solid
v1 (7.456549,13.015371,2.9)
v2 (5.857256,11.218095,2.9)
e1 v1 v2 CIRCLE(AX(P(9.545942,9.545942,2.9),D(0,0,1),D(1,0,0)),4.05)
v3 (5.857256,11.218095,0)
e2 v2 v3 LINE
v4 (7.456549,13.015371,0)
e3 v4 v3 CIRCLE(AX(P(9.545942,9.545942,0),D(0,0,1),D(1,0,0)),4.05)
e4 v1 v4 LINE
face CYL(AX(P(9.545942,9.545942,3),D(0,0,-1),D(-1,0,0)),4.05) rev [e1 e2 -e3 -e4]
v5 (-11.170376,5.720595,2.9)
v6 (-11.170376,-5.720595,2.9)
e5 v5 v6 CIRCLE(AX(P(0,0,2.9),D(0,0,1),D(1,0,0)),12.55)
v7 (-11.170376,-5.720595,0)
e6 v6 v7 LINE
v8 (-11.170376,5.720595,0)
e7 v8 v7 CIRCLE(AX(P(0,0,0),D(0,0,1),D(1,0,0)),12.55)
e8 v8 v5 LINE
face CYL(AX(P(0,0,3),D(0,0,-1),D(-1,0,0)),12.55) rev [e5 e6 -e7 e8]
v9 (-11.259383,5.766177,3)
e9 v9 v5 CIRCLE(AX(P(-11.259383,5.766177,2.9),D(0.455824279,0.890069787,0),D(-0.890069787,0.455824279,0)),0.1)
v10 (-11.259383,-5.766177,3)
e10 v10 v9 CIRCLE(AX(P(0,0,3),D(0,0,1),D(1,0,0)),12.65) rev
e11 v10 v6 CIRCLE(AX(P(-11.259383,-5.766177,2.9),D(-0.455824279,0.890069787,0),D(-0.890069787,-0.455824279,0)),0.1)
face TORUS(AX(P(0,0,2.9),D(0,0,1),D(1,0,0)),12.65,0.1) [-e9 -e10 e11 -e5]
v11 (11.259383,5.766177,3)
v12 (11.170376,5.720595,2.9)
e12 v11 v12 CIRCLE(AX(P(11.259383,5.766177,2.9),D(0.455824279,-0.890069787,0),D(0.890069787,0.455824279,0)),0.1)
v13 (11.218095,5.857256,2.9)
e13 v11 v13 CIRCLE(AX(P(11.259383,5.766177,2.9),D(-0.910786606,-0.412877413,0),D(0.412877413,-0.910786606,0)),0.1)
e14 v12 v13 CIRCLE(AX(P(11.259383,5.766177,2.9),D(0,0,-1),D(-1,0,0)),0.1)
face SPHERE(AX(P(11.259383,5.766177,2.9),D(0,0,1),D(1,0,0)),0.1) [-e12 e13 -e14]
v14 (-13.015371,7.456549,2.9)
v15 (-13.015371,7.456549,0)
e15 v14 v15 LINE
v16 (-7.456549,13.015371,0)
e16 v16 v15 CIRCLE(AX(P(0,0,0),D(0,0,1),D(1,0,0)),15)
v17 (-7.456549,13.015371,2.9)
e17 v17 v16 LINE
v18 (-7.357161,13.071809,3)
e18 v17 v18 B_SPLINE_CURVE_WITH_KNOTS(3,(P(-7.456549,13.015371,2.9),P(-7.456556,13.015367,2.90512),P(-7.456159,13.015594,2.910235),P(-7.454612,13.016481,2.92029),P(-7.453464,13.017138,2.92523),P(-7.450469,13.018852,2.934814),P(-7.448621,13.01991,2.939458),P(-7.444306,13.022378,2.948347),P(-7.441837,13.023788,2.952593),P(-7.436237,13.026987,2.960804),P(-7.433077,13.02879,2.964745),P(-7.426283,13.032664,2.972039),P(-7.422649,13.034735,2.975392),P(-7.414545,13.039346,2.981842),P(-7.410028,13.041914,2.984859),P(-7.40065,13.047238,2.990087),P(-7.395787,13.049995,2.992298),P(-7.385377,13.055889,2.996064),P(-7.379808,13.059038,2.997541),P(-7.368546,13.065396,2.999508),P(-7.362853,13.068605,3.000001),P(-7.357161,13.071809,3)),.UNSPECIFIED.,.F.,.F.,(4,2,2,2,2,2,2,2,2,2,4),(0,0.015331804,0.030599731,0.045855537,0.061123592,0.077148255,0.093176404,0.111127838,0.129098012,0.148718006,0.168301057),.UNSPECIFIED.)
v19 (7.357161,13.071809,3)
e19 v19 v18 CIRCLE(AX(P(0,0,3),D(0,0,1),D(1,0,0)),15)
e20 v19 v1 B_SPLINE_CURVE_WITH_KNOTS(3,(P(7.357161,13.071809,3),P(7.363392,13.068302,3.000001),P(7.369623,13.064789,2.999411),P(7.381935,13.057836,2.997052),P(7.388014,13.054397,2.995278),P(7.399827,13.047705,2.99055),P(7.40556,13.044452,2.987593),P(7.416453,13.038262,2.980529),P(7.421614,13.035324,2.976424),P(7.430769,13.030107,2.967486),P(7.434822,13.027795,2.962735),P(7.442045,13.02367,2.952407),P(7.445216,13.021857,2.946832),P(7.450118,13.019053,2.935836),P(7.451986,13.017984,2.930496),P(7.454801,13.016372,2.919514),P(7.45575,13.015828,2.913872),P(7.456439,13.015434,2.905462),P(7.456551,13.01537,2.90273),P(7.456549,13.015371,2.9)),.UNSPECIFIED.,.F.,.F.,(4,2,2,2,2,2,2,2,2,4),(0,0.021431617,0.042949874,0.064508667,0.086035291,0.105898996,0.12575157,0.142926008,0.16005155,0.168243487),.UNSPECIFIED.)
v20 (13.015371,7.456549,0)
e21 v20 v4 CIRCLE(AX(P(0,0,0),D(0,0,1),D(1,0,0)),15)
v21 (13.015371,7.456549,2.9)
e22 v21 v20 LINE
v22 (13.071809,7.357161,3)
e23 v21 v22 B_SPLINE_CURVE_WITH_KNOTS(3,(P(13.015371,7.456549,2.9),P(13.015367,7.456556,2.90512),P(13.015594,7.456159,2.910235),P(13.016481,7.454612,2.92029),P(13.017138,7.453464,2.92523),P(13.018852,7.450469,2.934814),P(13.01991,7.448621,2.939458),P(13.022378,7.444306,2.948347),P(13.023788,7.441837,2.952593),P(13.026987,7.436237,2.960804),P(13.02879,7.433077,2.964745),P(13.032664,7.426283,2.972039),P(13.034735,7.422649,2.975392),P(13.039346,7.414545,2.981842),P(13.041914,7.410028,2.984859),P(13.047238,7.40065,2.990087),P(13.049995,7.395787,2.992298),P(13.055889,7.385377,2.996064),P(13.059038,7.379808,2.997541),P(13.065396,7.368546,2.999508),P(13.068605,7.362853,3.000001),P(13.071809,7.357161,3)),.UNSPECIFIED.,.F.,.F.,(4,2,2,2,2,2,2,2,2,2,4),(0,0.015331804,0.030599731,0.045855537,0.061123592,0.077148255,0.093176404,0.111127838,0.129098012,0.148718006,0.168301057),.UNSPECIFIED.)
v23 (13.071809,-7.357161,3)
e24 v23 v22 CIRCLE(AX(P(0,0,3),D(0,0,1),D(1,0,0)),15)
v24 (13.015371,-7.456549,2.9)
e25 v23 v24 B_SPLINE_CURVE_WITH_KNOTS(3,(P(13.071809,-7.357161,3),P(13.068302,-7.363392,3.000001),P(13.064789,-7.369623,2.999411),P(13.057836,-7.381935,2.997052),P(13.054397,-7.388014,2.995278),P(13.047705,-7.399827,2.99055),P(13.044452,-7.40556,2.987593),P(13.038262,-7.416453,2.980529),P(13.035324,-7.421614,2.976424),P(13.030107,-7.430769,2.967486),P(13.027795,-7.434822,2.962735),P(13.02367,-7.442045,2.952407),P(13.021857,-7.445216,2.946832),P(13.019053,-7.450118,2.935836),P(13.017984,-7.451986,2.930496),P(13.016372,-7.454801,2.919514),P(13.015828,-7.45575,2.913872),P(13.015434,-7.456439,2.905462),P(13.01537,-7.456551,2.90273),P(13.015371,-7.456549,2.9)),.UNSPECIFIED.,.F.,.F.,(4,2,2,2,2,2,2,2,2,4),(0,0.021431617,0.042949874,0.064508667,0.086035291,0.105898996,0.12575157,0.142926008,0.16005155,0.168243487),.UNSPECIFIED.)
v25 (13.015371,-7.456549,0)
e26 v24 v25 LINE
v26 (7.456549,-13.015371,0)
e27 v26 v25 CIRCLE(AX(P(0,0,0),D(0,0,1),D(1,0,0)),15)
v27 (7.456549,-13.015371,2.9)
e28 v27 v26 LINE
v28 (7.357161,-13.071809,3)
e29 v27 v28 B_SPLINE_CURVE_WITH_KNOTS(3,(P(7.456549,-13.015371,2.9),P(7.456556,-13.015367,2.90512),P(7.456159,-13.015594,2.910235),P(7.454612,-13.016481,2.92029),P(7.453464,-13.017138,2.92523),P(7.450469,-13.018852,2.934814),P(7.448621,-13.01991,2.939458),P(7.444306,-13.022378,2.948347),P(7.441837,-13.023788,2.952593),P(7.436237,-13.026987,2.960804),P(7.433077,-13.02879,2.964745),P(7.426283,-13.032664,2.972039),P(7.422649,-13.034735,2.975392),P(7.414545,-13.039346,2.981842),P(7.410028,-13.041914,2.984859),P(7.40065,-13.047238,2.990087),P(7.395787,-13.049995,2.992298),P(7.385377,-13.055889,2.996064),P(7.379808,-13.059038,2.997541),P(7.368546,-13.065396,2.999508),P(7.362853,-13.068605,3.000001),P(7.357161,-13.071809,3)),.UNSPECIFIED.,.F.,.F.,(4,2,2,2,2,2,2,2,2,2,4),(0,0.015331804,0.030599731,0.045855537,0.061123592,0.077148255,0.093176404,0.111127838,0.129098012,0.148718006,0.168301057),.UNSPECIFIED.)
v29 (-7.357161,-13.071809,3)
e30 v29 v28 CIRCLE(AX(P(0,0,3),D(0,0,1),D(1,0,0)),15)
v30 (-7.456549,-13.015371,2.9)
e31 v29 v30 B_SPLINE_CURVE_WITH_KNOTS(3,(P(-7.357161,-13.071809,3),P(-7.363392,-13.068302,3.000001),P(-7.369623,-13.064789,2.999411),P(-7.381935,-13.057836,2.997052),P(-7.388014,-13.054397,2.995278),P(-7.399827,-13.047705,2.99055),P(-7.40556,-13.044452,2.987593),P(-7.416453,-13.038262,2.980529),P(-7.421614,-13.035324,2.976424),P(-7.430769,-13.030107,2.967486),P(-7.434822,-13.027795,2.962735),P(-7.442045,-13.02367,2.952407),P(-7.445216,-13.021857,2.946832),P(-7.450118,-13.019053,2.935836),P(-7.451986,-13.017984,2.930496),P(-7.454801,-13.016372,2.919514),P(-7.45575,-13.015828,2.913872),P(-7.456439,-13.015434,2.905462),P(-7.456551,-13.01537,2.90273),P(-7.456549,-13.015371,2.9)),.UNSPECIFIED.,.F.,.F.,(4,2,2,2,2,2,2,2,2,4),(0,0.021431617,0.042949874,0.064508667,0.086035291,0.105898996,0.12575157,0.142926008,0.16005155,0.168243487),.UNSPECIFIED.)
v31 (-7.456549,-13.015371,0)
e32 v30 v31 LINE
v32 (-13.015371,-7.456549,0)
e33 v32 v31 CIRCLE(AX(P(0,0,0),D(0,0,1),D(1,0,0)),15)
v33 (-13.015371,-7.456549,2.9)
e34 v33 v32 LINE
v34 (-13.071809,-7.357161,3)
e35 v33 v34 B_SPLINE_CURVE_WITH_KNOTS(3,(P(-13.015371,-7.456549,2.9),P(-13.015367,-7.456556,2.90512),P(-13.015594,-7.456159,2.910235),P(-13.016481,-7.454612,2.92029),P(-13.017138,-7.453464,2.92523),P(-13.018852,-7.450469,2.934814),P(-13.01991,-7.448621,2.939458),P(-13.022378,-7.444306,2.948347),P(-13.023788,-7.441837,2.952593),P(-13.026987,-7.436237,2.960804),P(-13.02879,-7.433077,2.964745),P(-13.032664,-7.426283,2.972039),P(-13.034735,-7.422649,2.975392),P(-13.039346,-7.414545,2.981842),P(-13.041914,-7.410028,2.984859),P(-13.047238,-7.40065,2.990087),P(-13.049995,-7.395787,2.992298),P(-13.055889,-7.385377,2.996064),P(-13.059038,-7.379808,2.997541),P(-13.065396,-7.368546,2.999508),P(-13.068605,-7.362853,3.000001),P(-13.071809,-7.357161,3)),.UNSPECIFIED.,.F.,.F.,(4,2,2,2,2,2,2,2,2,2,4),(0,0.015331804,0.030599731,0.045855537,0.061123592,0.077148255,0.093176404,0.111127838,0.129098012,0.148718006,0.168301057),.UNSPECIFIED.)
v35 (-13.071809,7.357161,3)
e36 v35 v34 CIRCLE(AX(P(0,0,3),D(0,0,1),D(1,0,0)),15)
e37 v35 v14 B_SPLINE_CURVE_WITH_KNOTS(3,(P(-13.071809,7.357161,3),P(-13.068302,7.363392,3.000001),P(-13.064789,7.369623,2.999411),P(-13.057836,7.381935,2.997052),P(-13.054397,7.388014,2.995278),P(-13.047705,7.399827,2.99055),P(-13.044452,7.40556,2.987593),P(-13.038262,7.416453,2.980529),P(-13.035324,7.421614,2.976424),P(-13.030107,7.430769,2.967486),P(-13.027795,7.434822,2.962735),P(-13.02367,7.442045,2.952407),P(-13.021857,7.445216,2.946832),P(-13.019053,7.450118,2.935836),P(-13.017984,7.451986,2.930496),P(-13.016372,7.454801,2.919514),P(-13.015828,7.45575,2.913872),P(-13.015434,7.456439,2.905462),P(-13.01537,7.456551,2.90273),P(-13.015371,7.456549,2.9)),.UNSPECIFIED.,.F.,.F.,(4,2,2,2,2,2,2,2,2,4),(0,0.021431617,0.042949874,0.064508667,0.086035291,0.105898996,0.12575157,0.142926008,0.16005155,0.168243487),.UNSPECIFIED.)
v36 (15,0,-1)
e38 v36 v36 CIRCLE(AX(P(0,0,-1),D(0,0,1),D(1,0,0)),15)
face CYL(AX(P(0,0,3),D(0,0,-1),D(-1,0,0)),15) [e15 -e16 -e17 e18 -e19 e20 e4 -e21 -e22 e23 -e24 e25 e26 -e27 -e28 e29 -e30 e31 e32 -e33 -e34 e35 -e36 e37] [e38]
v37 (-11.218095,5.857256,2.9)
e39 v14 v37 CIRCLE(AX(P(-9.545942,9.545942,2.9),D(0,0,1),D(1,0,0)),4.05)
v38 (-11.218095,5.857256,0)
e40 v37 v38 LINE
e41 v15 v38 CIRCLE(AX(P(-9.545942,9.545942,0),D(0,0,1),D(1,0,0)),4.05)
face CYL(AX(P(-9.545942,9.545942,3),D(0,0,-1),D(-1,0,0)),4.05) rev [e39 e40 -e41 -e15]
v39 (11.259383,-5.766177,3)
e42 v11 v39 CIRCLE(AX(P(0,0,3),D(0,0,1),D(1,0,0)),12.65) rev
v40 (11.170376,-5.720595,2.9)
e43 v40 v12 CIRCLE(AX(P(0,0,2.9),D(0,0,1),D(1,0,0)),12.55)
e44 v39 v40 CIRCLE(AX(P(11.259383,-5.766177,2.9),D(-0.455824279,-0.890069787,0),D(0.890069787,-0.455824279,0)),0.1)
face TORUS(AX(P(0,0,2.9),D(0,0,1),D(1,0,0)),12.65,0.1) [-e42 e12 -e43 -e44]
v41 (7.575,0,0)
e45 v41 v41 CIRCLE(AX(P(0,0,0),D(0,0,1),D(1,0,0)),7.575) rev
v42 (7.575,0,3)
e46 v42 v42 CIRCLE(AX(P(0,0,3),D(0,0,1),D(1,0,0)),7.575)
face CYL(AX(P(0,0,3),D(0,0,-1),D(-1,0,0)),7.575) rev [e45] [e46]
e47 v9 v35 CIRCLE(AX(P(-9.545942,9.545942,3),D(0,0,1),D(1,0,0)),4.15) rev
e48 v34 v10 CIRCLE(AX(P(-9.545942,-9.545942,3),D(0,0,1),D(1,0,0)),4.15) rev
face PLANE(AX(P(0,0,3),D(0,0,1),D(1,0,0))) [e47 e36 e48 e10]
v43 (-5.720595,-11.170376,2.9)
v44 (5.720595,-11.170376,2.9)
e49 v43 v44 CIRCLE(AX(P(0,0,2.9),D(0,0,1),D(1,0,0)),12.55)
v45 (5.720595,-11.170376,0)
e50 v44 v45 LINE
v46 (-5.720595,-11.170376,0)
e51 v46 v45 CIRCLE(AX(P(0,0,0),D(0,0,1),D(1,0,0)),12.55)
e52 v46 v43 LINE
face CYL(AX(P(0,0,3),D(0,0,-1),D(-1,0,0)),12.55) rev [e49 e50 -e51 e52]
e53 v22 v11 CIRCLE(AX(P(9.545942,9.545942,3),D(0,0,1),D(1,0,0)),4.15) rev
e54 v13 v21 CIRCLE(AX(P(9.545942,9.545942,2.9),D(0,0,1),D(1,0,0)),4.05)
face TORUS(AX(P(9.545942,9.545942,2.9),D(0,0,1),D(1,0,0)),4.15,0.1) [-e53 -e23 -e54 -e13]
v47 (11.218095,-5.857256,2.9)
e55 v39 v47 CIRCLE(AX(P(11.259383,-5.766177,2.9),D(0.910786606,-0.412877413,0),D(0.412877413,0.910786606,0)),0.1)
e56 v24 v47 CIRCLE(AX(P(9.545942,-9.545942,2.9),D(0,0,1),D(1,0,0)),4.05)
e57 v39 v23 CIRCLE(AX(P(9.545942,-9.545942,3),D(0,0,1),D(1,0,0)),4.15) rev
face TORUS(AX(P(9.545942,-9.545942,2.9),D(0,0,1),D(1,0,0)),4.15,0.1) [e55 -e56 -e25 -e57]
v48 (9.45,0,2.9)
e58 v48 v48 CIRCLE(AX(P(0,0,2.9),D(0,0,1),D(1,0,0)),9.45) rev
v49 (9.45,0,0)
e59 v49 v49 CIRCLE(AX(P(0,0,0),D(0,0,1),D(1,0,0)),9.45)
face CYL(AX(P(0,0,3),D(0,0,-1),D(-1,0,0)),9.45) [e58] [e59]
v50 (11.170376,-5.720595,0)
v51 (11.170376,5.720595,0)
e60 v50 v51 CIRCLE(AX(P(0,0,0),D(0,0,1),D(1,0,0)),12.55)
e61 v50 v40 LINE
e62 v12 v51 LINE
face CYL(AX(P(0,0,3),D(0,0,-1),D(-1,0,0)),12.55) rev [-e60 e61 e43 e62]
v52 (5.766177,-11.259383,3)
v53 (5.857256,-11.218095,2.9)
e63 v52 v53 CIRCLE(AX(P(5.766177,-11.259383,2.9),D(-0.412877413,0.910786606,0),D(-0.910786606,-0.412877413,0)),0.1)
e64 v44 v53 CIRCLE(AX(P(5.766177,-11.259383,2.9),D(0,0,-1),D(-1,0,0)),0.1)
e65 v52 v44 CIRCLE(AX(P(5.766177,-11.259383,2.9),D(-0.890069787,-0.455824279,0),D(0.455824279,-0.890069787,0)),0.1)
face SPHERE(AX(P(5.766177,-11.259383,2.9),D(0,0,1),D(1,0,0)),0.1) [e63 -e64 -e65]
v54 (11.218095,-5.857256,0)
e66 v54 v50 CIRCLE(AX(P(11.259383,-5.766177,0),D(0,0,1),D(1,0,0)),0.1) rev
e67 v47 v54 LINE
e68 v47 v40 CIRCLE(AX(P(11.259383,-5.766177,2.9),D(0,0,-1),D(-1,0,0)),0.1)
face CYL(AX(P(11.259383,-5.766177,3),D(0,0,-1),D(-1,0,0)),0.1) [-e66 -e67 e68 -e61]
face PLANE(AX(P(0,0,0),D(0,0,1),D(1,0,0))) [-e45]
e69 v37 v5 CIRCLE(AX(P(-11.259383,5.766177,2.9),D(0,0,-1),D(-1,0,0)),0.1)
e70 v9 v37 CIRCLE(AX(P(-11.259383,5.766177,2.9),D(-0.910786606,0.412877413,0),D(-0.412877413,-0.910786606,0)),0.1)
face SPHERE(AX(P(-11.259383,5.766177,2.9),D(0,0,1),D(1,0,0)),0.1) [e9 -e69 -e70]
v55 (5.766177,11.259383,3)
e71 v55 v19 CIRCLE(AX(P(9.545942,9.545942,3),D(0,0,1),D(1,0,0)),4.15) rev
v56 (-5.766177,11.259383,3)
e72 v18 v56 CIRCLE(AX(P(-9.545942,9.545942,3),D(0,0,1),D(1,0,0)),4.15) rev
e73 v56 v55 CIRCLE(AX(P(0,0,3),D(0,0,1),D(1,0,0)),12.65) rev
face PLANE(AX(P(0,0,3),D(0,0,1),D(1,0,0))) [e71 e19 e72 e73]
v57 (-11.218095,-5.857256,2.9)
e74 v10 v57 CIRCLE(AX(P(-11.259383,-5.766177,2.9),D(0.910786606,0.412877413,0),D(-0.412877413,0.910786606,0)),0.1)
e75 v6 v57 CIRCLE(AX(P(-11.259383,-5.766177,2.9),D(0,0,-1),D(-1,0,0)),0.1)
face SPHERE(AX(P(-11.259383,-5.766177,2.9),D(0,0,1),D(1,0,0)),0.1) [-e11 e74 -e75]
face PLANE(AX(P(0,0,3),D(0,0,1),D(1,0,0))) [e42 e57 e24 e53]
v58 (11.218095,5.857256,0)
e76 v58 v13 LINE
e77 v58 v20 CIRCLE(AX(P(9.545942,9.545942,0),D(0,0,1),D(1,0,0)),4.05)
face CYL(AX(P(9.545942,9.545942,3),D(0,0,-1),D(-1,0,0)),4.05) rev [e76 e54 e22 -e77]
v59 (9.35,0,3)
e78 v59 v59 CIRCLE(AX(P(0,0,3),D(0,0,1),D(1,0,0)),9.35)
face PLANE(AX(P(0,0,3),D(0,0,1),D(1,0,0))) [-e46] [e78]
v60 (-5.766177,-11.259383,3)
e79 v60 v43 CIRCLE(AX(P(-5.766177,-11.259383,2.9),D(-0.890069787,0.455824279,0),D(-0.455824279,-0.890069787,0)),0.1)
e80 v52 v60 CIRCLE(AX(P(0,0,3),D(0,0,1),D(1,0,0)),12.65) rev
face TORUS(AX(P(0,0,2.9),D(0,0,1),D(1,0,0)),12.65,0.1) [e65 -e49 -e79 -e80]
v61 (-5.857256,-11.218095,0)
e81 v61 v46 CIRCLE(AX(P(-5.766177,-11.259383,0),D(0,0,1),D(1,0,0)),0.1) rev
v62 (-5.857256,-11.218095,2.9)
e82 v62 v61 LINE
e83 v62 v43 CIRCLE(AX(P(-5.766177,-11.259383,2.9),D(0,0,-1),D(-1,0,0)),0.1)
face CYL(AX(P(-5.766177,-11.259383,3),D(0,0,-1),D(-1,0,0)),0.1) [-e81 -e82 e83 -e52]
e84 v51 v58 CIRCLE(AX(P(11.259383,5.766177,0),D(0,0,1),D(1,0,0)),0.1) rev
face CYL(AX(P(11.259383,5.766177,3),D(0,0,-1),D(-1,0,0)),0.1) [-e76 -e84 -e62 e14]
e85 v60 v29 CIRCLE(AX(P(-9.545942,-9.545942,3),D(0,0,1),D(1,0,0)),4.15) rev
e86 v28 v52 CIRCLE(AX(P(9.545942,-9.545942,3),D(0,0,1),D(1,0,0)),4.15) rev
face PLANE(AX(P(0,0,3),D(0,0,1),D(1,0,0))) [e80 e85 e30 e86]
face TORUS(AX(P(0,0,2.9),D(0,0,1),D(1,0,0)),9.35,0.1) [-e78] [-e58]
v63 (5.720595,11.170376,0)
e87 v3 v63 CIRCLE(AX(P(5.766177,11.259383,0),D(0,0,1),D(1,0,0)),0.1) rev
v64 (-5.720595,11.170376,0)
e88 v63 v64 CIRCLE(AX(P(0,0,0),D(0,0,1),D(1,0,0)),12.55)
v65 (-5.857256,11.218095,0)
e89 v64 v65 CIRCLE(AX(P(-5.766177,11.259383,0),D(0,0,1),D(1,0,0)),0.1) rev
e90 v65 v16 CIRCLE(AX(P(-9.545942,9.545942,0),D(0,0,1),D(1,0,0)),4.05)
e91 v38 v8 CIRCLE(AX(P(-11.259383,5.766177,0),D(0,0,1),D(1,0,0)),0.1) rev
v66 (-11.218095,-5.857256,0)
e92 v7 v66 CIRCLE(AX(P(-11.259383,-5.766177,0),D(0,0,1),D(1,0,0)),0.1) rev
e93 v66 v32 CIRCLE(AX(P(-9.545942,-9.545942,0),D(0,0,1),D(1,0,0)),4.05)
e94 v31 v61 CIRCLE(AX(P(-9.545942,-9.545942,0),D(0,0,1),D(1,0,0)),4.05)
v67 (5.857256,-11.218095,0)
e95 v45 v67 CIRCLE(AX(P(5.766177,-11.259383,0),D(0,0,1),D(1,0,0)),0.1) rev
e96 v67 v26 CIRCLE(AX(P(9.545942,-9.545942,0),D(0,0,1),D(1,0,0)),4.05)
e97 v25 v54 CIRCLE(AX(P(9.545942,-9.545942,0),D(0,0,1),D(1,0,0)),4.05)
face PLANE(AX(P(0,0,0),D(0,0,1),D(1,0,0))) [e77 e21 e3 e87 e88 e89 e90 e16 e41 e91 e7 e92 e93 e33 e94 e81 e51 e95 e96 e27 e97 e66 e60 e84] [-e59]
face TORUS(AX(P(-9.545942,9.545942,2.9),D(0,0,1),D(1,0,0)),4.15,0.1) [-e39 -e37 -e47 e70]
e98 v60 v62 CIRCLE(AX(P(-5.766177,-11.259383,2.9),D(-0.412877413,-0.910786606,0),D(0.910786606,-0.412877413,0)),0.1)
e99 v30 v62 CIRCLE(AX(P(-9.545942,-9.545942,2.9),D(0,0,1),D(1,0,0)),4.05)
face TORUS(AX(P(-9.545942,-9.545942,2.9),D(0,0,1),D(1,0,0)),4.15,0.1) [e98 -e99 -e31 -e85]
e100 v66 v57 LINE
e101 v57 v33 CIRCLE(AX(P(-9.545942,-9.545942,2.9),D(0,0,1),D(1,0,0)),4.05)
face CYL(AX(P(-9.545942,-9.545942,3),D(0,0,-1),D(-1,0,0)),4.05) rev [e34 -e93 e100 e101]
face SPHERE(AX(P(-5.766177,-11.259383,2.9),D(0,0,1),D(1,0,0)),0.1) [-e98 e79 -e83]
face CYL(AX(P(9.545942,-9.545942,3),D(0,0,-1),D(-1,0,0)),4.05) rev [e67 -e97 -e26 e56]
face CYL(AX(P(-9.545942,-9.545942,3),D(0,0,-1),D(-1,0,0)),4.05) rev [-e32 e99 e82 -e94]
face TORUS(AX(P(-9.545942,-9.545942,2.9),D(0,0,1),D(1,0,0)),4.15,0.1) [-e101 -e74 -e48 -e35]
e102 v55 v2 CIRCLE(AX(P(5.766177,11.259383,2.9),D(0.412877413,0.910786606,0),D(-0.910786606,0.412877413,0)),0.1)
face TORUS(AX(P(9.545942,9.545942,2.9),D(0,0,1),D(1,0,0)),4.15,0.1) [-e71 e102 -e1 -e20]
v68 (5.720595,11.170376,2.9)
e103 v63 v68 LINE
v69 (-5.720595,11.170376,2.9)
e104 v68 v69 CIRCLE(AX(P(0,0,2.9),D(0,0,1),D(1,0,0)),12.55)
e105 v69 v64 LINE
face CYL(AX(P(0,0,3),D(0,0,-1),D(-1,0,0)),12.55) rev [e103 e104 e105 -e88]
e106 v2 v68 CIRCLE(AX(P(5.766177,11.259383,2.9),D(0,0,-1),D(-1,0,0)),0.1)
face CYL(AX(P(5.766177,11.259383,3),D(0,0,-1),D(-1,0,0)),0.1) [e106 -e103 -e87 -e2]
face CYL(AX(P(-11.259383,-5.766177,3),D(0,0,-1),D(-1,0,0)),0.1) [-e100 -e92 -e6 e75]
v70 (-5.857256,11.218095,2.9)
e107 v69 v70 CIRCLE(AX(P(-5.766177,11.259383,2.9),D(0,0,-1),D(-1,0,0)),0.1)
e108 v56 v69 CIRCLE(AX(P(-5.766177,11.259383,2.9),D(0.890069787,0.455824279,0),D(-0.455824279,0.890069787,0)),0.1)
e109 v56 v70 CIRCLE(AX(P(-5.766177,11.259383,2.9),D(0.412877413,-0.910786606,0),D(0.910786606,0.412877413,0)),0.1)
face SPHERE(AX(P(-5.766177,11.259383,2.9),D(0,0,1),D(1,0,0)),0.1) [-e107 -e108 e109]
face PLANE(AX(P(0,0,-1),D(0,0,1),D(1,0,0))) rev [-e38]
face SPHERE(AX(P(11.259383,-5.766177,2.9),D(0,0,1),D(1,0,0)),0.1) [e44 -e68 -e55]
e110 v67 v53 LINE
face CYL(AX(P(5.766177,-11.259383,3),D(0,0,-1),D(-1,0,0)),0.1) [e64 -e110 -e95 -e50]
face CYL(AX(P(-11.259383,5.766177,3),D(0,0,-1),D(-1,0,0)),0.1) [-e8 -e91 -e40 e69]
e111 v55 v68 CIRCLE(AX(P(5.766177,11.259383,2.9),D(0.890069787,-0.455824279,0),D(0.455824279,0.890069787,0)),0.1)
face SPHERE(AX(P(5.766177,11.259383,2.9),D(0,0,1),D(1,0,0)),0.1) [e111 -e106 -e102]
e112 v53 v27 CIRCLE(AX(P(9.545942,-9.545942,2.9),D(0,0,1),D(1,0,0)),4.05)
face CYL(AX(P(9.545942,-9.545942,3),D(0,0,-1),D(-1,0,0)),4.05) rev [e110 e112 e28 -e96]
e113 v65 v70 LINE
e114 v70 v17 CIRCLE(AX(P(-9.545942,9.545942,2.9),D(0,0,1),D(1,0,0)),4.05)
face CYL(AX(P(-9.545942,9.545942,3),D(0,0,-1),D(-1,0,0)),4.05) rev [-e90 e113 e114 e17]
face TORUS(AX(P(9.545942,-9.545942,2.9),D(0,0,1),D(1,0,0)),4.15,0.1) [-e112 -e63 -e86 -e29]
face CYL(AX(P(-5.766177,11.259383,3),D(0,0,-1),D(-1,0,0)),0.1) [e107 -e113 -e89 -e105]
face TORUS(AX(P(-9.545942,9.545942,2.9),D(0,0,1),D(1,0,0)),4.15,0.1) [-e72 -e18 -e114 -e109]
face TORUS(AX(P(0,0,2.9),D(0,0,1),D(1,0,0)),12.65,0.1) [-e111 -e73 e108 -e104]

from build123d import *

# Parameters (mm, degrees)
BOSS_EXTRUDE1_DEPTH   = 3
BOSS_EXTRUDE1_2_DEPTH = 3
BOSS_EXTRUDE1_3_DEPTH = 3
BOSS_EXTRUDE1_4_DEPTH = 3
SKETCH1_R             = 9.45
SKETCH1_R_2           = 7.575
BOSS_EXTRUDE1_5_DEPTH = 3
BOSS_EXTRUDE2_START   = -1
SKETCH2_R             = 15
BOSS_EXTRUDE2_DEPTH   = 1
FILLET1_R             = 0.1
FILLET2_R             = 0.1


with BuildPart() as part:
    # Sketch1 → Boss-Extrude1 (new body)
    with BuildSketch(Plane.XY):
        with BuildLine():
            ThreePointArc((5.814987036, 11.121529831), (6.485587296, 12.198625444), (7.456549067, 13.01537076))
            ThreePointArc((7.456549067, 13.01537076), (0, 15), (-7.456549067, 13.01537076))
            ThreePointArc((-7.456549067, 13.01537076), (-6.485587296, 12.198625444), (-5.814987036, 11.121529831))
            ThreePointArc((-5.814987036, 11.121529831), (0, 12.55), (5.814987036, 11.121529831))
        make_face()
    extrude(amount=BOSS_EXTRUDE1_DEPTH)



with BuildPart() as body_2:
    # Sketch1 → Boss-Extrude1 2 (new body)
    with BuildSketch(Plane.XY):
        with BuildLine():
            ThreePointArc((13.01537076, -7.456549067), (14.495353762, -3.858071967), (15, 0))
            ThreePointArc((15, 0), (14.495353762, 3.858071967), (13.01537076, 7.456549067))
            ThreePointArc((13.01537076, 7.456549067), (12.198625444, 6.485587296), (11.121529831, 5.814987036))
            ThreePointArc((11.121529831, 5.814987036), (12.55, 0), (11.121529831, -5.814987036))
            ThreePointArc((11.121529831, -5.814987036), (12.198625444, -6.485587296), (13.01537076, -7.456549067))
        make_face()
    extrude(amount=BOSS_EXTRUDE1_2_DEPTH)


with BuildPart() as body_3:
    # Sketch1 → Boss-Extrude1 3 (new body)
    with BuildSketch(Plane.XY):
        with BuildLine():
            ThreePointArc((-7.456549067, -13.01537076), (0, -15), (7.456549067, -13.01537076))
            ThreePointArc((7.456549067, -13.01537076), (6.485587296, -12.198625444), (5.814987036, -11.121529831))
            ThreePointArc((5.814987036, -11.121529831), (0, -12.55), (-5.814987036, -11.121529831))
            ThreePointArc((-5.814987036, -11.121529831), (-6.485587296, -12.198625444), (-7.456549067, -13.01537076))
        make_face()
    extrude(amount=BOSS_EXTRUDE1_3_DEPTH)


with BuildPart() as body_4:
    # Sketch1 → Boss-Extrude1 4 (new body)
    with BuildSketch(Plane.XY):
        with BuildLine():
            ThreePointArc((-11.121529831, 5.814987036), (-12.198625444, 6.485587296), (-13.01537076, 7.456549067))
            ThreePointArc((-13.01537076, 7.456549067), (-15, 0), (-13.01537076, -7.456549067))
            ThreePointArc((-13.01537076, -7.456549067), (-12.198625444, -6.485587296), (-11.121529831, -5.814987036))
            ThreePointArc((-11.121529831, -5.814987036), (-12.55, 0), (-11.121529831, 5.814987036))
        make_face()
    extrude(amount=BOSS_EXTRUDE1_4_DEPTH)


with BuildPart() as body_5:
    # Sketch1 → Boss-Extrude1 5 (new body)
    with BuildSketch(Plane.XY):
        Circle(SKETCH1_R)
        Circle(SKETCH1_R_2, mode=Mode.SUBTRACT)
    extrude(amount=BOSS_EXTRUDE1_5_DEPTH)


with BuildPart() as part_1:
    add(part.part)

    add(body_2.part)  # Boss-Extrude2 merges body 2

    add(body_3.part)  # Boss-Extrude2 merges body 3

    add(body_4.part)  # Boss-Extrude2 merges body 4

    add(body_5.part)  # Boss-Extrude2 merges body 5
    # Sketch2 → Boss-Extrude2 (add)
    with BuildSketch(Plane.XY.offset(BOSS_EXTRUDE2_START)):
        with Locations(Location((0, 0, 0), (0, 0, 150.191461703))):
            Circle(SKETCH2_R)
    extrude(amount=BOSS_EXTRUDE2_DEPTH)

    # Fillet1
    fillet1_edges = [part_1.edges().sort_by_distance(p)[0] for p in [
        (11.121529831, 5.814987036, 1.5),
        (11.121529831, -5.814987036, 1.5),
        (5.814987036, -11.121529831, 1.5),
        (-5.814987036, -11.121529831, 1.5),
        (-11.121529831, -5.814987036, 1.5),
        (-11.121529831, 5.814987036, 1.5),
        (5.814987036, 11.121529831, 1.5),
        (-5.814987036, 11.121529831, 1.5),
    ]]
    fillet(fillet1_edges, radius=FILLET1_R)

    # Fillet2
    fillet2_edges = [part_1.edges().sort_by_distance(p)[0] for p in [
        (6.520367717, 12.238227379, 3),
        (12.238227379, -6.520367717, 3),
        (-6.520367717, -12.238227379, 3),
        (-12.238227379, 6.520367717, 3),
        (-9.45, 0, 3),
        (0, -12.55, 3),
        (6.520367717, -12.238227379, 3),
        (5.799143147, -11.164972845, 3),
        (-5.799143147, -11.164972845, 3),
        (12.55, 0, 3),
        (12.238227379, 6.520367717, 3),
        (11.164972845, 5.799143147, 3),
        (11.164972845, -5.799143147, 3),
        (0, 12.55, 3),
        (-6.520367717, 12.238227379, 3),
        (-5.799143147, 11.164972845, 3),
        (5.799143147, 11.164972845, 3),
        (-12.55, 0, 3),
        (-12.238227379, -6.520367717, 3),
        (-11.164972845, -5.799143147, 3),
        (-11.164972845, 5.799143147, 3),
    ]]
    fillet(fillet2_edges, radius=FILLET2_R - 0.0001)  # a hair under: the kernel refuses the full size


solid = part_1.part
